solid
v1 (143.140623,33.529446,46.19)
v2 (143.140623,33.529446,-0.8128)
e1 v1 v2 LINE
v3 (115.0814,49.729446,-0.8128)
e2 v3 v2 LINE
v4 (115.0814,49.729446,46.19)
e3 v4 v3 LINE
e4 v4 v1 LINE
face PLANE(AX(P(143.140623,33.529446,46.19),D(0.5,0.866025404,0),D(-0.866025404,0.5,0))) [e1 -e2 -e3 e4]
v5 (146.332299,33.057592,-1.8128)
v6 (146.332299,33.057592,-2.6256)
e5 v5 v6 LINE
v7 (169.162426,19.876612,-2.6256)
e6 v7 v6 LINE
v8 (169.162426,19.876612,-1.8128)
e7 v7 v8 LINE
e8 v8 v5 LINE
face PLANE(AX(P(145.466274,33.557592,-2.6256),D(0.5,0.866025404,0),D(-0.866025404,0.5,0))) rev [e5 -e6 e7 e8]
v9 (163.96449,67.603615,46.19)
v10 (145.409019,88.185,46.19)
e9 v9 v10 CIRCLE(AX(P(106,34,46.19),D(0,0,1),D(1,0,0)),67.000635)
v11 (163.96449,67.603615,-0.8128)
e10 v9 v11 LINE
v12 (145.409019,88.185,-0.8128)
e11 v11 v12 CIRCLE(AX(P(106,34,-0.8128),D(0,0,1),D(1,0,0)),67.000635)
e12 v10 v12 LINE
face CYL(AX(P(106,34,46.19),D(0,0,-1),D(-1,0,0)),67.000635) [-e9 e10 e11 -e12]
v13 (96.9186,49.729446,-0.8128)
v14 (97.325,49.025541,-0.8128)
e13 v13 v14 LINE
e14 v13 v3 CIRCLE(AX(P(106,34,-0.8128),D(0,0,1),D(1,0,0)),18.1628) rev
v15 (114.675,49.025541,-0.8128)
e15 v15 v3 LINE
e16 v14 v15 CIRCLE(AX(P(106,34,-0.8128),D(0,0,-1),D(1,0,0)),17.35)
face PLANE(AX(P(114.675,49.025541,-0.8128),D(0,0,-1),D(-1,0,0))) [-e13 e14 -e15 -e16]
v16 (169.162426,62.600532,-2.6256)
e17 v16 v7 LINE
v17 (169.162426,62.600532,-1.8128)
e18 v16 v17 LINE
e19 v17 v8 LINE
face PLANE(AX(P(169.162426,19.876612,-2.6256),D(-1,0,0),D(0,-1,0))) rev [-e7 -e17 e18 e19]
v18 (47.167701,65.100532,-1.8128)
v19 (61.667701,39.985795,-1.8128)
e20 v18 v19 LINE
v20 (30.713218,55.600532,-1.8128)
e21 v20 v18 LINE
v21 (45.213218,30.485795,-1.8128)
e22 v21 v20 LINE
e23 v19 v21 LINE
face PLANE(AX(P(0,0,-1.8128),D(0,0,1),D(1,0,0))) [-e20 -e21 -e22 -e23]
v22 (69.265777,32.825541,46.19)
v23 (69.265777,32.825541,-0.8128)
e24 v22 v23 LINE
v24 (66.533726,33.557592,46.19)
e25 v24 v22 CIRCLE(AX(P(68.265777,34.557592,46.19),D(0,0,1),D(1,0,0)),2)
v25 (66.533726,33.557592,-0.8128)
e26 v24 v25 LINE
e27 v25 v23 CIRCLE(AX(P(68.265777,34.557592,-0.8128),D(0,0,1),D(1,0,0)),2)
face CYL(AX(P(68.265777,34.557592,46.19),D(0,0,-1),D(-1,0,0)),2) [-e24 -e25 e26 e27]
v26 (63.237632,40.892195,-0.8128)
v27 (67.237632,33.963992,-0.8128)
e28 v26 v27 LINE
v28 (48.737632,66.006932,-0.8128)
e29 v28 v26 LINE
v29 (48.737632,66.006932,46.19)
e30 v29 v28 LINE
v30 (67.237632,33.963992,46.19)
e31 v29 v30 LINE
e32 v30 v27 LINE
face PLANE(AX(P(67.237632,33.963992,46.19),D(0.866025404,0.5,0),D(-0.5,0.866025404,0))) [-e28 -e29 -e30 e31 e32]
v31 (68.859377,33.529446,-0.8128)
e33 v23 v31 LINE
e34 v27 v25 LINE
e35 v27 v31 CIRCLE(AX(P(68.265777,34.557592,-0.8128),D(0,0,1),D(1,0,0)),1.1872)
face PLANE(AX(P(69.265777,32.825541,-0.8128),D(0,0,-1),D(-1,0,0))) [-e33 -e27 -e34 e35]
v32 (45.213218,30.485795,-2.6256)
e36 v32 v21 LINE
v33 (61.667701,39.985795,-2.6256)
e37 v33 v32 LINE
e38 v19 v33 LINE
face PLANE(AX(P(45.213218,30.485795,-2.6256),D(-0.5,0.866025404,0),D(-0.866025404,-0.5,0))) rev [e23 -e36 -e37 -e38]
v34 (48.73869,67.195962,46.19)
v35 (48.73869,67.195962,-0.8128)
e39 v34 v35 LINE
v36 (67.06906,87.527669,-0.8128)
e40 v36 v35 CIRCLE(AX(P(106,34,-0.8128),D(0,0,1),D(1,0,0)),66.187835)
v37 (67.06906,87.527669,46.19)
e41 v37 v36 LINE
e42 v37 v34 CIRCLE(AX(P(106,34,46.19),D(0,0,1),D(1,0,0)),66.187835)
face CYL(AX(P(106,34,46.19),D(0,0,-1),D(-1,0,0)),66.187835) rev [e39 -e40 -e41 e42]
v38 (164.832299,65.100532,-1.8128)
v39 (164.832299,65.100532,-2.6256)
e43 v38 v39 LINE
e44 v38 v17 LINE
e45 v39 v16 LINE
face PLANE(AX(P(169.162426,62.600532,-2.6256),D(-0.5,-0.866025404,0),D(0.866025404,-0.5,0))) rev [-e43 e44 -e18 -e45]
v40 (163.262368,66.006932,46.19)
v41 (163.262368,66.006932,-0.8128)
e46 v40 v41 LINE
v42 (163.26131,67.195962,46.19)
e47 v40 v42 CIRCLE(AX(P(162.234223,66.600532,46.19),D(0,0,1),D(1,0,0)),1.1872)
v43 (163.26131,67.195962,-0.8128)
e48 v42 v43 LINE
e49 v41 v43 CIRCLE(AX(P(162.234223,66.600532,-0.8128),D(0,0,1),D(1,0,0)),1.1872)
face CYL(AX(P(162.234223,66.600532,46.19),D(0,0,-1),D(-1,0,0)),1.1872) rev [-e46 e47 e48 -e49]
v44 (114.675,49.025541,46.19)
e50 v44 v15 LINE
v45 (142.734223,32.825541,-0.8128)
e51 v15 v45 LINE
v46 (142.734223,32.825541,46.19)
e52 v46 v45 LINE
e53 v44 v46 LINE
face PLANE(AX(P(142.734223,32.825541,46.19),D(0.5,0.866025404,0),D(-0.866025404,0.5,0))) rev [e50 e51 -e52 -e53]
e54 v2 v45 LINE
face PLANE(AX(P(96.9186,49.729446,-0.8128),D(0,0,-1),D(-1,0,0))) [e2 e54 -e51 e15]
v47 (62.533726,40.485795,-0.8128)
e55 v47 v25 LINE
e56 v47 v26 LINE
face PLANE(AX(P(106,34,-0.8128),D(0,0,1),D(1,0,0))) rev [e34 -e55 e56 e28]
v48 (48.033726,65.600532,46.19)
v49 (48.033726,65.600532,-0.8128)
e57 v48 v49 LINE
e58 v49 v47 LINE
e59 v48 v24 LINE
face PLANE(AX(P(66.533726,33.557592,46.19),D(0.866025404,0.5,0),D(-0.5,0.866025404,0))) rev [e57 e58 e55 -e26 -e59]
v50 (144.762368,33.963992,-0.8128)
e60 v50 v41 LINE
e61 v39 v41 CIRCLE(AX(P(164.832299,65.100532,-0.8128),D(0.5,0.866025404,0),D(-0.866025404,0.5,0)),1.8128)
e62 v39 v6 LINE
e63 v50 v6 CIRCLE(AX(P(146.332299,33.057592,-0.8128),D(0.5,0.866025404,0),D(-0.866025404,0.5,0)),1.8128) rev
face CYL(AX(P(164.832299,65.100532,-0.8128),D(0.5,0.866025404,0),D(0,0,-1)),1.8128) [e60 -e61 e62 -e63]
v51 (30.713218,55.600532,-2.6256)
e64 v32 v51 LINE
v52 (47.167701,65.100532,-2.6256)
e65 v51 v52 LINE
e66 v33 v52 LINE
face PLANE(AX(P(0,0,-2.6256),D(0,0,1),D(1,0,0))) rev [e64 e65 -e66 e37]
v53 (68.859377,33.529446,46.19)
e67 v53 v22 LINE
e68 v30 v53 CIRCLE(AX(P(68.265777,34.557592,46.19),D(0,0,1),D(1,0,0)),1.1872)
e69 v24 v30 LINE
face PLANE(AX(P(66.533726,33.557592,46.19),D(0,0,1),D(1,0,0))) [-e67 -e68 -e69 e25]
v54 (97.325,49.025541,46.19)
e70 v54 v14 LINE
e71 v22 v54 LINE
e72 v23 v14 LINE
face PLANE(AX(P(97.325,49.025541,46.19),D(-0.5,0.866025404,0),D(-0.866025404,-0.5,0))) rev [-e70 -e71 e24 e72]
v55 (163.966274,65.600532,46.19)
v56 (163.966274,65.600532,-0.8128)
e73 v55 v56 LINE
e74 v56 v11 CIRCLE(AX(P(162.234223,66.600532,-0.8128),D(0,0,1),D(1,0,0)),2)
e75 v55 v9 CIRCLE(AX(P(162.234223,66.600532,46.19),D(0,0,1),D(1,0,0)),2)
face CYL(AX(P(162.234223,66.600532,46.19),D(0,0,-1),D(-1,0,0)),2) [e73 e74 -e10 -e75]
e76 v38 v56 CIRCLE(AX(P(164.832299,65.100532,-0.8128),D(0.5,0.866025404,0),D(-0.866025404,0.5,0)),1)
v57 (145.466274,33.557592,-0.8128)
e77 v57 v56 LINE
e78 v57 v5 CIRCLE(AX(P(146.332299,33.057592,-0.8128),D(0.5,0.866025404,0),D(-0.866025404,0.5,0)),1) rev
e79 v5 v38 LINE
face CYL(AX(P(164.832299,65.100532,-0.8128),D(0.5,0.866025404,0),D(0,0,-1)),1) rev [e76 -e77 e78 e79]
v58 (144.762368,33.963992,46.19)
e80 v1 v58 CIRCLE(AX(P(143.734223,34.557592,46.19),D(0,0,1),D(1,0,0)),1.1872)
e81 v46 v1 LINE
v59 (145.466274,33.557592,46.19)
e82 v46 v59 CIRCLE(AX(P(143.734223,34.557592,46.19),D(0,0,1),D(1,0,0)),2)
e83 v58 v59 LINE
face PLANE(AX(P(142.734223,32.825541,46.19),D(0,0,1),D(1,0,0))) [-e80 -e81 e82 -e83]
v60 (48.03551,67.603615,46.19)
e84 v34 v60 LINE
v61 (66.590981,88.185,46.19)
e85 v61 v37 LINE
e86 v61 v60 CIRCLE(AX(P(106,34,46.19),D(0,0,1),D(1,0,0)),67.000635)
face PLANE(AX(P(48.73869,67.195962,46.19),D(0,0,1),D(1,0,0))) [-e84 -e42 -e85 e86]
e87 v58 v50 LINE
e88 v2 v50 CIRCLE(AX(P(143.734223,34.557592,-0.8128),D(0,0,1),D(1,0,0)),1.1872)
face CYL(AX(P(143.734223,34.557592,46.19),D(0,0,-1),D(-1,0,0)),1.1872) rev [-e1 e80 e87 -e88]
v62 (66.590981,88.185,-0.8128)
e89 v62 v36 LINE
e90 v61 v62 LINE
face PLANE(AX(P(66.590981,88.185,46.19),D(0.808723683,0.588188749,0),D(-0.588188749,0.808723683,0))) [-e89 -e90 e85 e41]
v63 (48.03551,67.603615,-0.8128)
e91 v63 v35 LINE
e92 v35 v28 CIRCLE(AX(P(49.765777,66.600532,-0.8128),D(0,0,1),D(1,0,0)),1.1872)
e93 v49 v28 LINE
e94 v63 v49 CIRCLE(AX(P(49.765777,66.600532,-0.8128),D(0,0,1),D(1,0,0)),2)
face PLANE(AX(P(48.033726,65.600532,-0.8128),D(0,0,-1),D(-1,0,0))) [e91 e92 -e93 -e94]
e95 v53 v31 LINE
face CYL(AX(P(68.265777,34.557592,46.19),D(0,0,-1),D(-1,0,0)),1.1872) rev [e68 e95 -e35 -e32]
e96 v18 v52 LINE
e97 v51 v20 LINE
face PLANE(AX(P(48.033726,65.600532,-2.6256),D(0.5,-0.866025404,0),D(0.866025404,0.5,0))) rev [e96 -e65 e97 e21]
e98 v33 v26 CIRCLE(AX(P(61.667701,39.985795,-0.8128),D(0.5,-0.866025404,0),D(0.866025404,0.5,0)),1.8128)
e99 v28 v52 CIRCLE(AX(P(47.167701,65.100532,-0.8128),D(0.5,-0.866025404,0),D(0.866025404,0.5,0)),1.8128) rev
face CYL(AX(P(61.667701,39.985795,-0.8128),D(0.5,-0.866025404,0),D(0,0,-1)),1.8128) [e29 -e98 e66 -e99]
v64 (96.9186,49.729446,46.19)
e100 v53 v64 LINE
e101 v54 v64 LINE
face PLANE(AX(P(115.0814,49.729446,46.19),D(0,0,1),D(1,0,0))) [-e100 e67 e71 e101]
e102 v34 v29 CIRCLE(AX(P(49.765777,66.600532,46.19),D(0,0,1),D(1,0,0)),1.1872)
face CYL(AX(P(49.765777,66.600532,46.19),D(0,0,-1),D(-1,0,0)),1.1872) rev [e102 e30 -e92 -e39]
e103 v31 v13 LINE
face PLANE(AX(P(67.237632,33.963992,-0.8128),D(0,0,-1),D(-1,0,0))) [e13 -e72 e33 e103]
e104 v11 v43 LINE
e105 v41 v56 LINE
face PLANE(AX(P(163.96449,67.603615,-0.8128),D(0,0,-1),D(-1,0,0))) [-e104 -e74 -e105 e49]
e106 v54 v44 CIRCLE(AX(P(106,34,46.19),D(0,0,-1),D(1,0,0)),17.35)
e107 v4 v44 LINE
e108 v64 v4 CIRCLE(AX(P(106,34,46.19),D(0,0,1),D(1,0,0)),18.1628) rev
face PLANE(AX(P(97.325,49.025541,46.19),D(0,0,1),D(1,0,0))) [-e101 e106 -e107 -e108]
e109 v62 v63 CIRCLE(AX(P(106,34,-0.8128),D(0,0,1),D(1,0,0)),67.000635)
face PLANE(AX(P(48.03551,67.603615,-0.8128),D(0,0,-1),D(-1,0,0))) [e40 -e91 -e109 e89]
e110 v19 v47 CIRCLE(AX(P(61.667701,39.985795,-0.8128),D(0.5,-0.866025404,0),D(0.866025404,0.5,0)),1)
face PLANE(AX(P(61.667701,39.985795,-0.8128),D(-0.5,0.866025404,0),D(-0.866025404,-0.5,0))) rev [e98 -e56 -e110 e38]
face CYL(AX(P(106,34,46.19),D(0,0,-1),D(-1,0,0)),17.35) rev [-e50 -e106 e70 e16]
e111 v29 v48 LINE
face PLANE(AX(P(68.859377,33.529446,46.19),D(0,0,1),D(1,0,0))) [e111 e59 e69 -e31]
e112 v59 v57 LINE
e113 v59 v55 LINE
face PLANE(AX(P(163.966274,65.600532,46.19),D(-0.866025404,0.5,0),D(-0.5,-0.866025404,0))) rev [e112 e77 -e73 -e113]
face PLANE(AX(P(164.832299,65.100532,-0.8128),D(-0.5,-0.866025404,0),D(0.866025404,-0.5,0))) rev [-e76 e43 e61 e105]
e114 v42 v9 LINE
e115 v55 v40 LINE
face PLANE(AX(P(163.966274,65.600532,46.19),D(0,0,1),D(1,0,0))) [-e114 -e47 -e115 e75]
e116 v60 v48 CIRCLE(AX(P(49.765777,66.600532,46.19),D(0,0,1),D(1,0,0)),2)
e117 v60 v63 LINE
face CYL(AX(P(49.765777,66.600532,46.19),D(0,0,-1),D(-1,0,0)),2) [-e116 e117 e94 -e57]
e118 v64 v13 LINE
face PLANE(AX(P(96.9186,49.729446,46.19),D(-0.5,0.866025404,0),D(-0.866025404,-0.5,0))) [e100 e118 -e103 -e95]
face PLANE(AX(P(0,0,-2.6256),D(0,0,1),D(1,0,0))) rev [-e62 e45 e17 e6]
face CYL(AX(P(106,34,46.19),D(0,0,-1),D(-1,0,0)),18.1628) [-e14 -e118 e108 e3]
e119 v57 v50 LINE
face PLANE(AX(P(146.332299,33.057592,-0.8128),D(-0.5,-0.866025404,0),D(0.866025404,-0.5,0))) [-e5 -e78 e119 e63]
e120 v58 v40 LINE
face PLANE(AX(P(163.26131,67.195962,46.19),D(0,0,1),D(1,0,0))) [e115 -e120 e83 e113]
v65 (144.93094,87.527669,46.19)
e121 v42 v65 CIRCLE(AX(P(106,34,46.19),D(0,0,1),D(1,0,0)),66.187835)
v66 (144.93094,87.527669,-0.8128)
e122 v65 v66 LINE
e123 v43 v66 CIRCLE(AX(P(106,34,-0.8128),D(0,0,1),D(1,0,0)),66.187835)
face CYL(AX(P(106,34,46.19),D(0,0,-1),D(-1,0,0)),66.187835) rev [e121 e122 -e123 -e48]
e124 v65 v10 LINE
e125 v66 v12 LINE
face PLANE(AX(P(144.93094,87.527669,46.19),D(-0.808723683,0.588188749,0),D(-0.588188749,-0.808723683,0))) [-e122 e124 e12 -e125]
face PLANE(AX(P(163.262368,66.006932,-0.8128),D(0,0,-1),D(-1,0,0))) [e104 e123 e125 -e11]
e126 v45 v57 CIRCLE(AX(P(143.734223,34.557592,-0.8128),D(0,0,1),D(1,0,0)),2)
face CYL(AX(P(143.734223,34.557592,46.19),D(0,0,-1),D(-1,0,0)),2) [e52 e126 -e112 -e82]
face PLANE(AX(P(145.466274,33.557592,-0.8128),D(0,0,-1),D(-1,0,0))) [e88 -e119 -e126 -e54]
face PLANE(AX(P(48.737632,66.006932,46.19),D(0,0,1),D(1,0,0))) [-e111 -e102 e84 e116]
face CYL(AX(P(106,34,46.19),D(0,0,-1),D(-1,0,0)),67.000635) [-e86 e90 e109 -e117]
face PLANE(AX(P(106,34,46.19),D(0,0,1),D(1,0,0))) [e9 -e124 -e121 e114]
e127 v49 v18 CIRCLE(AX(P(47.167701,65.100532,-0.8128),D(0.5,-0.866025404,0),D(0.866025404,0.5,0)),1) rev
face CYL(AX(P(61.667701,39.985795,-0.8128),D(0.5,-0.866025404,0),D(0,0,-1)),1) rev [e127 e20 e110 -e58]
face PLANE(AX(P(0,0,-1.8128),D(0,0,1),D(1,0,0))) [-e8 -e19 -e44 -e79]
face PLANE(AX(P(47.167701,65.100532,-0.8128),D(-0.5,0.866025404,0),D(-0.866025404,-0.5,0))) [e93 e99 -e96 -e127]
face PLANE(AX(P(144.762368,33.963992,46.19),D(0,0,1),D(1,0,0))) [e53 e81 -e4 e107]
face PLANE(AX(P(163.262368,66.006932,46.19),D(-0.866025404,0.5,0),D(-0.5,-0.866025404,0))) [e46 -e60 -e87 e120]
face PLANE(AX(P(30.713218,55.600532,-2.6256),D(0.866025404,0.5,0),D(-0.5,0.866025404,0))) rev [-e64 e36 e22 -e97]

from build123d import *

# Parameters (mm, degrees)
BASE_FLANGE1_DEPTH      = 46.19
BASE_FLANGE1_DEPTH_BACK = 0.8128
EDGE_FLANGE1_DEPTH      = 29
EDGE_FLANGE1_BEND_DEPTH = 37
EDGE_FLANGE1_START      = 0.8128
EDGE_FLANGE1_FLAT_DEPTH = 0.8128


# Sheet-metal steps are written as plain solids
with BuildPart() as part:
    # Sketch1 → Base-Flange1 (new, two sides: drawn at the far end of the back side and taken through both)
    with BuildSketch(Plane.XY.offset(-BASE_FLANGE1_DEPTH_BACK)):
        with BuildLine():
            ThreePointArc((145.409019443, 88.185), (155.762419921, 78.86409034), (163.964489977, 67.603614987))
            ThreePointArc((163.964489977, 67.603614987), (164.234222289, 66.60231267), (163.96627389, 65.600531503))
            Line((163.96627389, 65.600531503), (145.46627389, 33.557591563))
            ThreePointArc((145.46627389, 33.557591563), (144.251861173, 32.625739911), (142.734223083, 32.825540756))
            Line((142.734223083, 32.825540756), (114.675, 49.025540756))
            ThreePointArc((114.675, 49.025540756), (106, 51.35), (97.325, 49.025540756))
            Line((97.325, 49.025540756), (69.265776917, 32.825540756))
            ThreePointArc((69.265776917, 32.825540756), (67.748138827, 32.625739911), (66.53372611, 33.557591563))
            Line((66.53372611, 33.557591563), (48.03372611, 65.600531503))
            ThreePointArc((48.03372611, 65.600531503), (47.76577771, 66.60231267), (48.035510023, 67.603614987))
            ThreePointArc((48.035510023, 67.603614987), (56.237580079, 78.86409034), (66.590980557, 88.185))
            Line((66.590980557, 88.185), (67.069060372, 87.52766939))
            ThreePointArc((67.069060372, 87.52766939), (56.841259359, 78.319833814), (48.738690489, 67.195961859))
            ThreePointArc((48.738690489, 67.195961859), (48.578577388, 66.601588804), (48.737631558, 66.006931503))
            Line((48.737631558, 66.006931503), (67.237631558, 33.963991563))
            ThreePointArc((67.237631558, 33.963991563), (67.958506947, 33.410844422), (68.859376917, 33.529446204))
            Line((68.859376917, 33.529446204), (96.9186, 49.729446204))
            ThreePointArc((96.9186, 49.729446204), (106, 52.1628), (115.0814, 49.729446204))
            Line((115.0814, 49.729446204), (143.140623083, 33.529446204))
            ThreePointArc((143.140623083, 33.529446204), (144.041493053, 33.410844422), (144.762368442, 33.963991563))
            Line((144.762368442, 33.963991563), (163.262368442, 66.006931503))
            ThreePointArc((163.262368442, 66.006931503), (163.421422612, 66.601588804), (163.261309511, 67.195961859))
            ThreePointArc((163.261309511, 67.195961859), (155.158740641, 78.319833814), (144.930939628, 87.52766939))
            Line((144.930939628, 87.52766939), (145.409019443, 88.185))
        make_face()
    extrude(amount=BASE_FLANGE1_DEPTH + BASE_FLANGE1_DEPTH_BACK)

    # Edge-Flange1 section (across the edge) → Edge-Flange1 (add)
    with BuildSketch(Plane(origin=(48.03372611, 65.600531503, -1.8128), x_dir=(0, 0, 1), z_dir=(0.5000000000000168, -0.866025403784429, 0))):
        with BuildLine():
            Line((-0.8128, 1), (-0.8128, 20))
            Line((-0.8128, 20), (0, 20))
            Line((0, 20), (0, 1))
            ThreePointArc((0, 1), (0.292893219, 0.292893219), (1, 0))
            Line((1, 0), (1, -0.8128))
            ThreePointArc((1, -0.8128), (-0.281843173, -0.281843173), (-0.8128, 1))
        make_face()
    extrude(amount=EDGE_FLANGE1_DEPTH)

    # Edge-Flange1 bend section (across the edge) → Edge-Flange1 bend (add)
    with BuildSketch(Plane(origin=(145.46627389, 33.557591563, -1.8128), x_dir=(0, 0, 1), z_dir=(0.4999999999999994, 0.866025403784439, 0))):
        with BuildLine():
            Line((-0.8128, 1), (0, 1))
            ThreePointArc((0, 1), (0.292893219, 0.292893219), (1, 0))
            Line((1, 0), (1, -0.8128))
            ThreePointArc((1, -0.8128), (-0.281843173, -0.281843173), (-0.8128, 1))
        make_face()
    extrude(amount=EDGE_FLANGE1_BEND_DEPTH)

    # Edge-Flange1 profile (on flange) → Edge-Flange1 flat (add)
    with BuildSketch(Plane(origin=(94.568842026, -54.599346401, -1.8128), x_dir=(0.4999999999999994, 0.866025403784439, 0), z_dir=(0, 0, -1)).offset(EDGE_FLANGE1_START)):
        Polygon((101.794863729, 1), (138.794863729, 1), (138.794863729, 6), (101.794863729, 27.36195996), align=None)
    extrude(amount=-EDGE_FLANGE1_FLAT_DEPTH)


solid = part.part
